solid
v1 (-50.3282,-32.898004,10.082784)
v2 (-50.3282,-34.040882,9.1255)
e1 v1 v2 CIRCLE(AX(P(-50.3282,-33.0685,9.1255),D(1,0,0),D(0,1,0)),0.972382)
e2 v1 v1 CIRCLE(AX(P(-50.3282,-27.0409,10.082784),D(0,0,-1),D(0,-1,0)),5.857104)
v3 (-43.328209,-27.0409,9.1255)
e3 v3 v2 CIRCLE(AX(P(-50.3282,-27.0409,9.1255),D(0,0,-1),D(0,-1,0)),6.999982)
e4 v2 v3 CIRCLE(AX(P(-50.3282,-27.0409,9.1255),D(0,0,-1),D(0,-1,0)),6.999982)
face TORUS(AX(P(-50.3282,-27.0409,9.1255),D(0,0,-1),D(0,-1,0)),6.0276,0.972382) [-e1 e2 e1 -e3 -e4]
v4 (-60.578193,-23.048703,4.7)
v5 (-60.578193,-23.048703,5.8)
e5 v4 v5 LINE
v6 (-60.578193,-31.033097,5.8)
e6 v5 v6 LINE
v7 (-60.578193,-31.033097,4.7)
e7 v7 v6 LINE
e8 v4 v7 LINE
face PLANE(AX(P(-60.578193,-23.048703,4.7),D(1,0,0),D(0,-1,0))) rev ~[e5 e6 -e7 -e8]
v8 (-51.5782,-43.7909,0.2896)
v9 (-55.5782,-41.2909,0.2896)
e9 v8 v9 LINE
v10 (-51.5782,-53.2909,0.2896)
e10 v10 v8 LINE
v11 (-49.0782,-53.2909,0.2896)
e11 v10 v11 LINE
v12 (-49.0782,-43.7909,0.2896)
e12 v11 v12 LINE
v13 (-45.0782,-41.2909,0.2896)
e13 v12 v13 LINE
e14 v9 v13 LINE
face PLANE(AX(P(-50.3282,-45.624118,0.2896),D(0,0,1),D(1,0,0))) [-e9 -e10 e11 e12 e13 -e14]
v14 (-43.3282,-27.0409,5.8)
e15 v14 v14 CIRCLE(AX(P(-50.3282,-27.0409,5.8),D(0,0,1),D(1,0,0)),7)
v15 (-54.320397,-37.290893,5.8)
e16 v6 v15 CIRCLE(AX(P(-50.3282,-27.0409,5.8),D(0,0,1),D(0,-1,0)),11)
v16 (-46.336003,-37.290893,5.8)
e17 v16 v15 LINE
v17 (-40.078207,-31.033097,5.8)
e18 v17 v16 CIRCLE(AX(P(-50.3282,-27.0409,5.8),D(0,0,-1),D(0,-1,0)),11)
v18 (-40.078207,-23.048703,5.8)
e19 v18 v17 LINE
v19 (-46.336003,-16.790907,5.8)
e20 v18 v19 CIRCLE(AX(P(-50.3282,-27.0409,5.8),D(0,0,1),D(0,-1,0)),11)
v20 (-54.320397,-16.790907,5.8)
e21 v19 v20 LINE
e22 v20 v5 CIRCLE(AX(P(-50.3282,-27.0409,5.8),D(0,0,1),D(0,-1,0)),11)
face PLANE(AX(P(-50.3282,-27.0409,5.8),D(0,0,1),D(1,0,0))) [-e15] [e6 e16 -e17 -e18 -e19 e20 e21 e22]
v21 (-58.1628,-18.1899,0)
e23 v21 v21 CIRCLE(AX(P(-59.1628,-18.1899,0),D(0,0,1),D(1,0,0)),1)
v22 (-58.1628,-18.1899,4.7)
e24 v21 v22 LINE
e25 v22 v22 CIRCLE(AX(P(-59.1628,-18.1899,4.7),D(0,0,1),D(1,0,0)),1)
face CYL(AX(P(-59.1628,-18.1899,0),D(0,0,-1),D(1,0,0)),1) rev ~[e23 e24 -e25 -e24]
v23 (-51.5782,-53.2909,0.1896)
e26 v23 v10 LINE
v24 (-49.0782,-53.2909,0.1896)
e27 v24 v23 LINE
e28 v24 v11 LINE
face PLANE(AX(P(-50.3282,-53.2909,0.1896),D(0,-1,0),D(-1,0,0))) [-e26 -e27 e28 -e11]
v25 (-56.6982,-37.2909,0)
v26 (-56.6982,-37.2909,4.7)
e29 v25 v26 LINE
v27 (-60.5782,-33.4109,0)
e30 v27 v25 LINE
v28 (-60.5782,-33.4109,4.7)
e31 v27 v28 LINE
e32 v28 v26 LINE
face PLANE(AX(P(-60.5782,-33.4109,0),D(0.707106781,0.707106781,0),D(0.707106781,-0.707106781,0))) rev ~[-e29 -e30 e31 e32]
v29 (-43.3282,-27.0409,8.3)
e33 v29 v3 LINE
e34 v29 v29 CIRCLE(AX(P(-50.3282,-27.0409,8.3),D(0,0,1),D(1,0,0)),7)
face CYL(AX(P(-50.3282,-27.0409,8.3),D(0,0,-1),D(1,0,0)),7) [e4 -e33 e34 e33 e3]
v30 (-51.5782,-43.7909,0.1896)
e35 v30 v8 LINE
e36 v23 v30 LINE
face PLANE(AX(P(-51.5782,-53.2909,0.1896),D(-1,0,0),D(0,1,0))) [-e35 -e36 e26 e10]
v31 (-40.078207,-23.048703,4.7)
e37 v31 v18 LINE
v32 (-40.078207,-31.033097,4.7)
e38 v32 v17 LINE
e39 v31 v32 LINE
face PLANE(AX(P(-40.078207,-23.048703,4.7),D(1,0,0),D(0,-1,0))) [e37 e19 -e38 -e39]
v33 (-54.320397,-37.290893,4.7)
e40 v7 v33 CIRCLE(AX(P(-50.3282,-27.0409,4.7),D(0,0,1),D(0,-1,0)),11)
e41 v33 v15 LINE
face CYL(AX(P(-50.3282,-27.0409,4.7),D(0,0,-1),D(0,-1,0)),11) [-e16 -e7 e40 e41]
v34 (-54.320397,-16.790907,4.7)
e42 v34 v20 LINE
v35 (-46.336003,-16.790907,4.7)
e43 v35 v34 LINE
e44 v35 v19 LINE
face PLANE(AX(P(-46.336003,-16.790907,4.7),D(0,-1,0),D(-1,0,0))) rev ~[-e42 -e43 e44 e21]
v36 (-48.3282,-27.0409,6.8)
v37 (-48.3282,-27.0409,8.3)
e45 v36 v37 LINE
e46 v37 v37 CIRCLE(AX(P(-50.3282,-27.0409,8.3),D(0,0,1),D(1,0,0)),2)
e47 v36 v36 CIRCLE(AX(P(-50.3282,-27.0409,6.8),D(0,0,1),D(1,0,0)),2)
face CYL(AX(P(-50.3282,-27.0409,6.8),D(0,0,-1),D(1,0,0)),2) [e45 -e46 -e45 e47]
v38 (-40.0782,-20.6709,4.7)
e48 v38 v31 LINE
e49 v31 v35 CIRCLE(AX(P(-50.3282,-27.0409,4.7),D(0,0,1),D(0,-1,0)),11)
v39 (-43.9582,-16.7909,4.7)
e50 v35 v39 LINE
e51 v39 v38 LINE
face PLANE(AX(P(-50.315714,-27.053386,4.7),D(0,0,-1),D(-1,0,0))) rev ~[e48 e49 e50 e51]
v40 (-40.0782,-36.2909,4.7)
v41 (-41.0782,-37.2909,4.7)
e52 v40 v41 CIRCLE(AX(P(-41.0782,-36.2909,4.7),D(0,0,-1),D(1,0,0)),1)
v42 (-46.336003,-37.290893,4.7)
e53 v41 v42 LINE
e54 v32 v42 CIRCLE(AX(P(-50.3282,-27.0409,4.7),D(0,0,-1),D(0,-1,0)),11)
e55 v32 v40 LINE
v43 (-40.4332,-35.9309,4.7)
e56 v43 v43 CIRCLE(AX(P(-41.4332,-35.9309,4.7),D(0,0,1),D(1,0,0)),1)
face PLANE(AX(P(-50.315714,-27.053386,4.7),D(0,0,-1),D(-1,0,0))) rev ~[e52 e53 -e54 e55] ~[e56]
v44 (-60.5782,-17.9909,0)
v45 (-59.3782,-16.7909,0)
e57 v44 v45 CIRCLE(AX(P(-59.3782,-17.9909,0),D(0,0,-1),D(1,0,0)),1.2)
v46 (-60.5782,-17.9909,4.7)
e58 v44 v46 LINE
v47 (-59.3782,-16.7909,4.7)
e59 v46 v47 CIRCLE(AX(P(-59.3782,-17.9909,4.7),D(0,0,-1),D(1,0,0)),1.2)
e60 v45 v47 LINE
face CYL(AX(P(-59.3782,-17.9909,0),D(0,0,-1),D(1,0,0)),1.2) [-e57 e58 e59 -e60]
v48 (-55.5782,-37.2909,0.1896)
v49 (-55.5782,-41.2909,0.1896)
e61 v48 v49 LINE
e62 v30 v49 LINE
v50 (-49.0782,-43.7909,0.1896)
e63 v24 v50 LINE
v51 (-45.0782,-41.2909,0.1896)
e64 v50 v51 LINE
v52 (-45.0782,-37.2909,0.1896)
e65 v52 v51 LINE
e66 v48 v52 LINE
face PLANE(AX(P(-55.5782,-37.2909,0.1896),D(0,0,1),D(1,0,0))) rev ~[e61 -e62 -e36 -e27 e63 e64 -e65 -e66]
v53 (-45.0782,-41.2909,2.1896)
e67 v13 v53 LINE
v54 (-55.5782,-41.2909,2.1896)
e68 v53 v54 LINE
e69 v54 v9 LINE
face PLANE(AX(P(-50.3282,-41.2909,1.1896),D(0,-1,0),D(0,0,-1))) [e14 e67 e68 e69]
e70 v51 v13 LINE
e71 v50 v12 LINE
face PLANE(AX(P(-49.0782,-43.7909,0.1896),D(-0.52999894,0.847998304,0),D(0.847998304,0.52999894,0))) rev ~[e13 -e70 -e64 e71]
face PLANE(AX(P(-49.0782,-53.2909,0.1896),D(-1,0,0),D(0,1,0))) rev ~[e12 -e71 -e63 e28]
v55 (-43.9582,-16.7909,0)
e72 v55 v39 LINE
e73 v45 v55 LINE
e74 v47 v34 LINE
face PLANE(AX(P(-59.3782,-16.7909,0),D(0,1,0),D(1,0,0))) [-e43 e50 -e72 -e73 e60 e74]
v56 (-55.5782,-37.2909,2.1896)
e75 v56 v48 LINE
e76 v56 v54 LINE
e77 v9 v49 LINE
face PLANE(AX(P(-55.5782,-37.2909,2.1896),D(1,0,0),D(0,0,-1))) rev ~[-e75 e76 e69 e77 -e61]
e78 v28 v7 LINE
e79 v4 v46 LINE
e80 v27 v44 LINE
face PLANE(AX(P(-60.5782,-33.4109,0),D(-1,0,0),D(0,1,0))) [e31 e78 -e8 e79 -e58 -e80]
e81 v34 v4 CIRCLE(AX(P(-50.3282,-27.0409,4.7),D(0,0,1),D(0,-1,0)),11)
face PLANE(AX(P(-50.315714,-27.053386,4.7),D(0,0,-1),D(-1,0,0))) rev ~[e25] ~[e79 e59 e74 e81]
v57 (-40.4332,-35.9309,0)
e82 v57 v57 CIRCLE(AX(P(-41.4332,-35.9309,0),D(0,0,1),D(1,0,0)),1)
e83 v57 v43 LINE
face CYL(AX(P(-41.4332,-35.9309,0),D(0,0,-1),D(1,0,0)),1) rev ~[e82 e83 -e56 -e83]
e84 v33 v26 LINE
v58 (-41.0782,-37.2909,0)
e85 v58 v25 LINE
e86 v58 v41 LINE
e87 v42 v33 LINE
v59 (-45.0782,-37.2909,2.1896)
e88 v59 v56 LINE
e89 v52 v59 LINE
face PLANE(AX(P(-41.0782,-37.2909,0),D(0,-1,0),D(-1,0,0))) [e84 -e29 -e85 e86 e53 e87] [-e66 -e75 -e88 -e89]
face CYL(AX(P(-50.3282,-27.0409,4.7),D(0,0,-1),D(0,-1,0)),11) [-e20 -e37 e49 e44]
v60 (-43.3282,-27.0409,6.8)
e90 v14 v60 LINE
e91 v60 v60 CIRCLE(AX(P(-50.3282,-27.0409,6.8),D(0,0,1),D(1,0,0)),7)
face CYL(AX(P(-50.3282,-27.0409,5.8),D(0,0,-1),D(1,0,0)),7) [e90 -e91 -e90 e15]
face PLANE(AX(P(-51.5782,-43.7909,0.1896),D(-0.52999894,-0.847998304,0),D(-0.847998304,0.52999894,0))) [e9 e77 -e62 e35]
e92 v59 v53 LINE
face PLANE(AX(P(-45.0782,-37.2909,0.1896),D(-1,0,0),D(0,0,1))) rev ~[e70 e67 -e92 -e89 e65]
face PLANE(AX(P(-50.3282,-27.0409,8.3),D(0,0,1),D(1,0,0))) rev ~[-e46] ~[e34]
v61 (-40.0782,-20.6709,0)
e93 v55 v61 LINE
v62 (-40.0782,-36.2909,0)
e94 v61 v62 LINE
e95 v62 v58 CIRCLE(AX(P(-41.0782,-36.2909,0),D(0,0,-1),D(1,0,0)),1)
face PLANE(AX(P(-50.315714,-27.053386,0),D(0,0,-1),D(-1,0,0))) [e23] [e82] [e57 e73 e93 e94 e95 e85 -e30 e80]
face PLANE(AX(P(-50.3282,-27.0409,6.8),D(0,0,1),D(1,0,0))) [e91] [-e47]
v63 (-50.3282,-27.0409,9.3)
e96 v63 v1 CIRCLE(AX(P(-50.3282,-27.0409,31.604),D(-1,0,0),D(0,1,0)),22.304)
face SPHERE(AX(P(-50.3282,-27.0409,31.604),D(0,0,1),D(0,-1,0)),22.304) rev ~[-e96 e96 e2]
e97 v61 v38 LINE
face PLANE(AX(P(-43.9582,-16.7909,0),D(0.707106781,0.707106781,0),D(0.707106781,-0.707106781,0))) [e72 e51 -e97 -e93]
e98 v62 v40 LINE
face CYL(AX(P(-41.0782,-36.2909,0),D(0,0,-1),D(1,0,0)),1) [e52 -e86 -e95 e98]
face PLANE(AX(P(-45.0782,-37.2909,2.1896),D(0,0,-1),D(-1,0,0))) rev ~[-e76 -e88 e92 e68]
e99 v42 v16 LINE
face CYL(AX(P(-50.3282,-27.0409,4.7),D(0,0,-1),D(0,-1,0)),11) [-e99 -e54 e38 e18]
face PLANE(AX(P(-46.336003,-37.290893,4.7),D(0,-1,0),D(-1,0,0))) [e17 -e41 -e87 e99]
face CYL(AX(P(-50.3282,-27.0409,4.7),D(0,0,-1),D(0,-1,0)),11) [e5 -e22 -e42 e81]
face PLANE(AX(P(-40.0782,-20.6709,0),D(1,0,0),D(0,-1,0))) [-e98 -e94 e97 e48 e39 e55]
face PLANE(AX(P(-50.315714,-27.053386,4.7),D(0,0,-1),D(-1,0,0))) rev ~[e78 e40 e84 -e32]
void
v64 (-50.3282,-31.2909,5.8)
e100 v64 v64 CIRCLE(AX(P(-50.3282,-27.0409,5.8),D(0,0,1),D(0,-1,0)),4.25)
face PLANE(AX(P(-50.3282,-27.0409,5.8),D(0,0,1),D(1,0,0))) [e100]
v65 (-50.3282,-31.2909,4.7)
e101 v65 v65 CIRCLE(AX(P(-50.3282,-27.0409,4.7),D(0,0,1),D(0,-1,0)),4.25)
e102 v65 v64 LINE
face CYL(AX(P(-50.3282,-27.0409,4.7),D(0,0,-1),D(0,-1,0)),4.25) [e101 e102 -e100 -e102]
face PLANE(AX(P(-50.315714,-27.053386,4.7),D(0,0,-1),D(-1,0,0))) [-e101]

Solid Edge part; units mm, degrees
sketch "Sketch1" plane through (0, 0, 0) normal (0, 0, 1) x (1, 0, 0)
  circle A0 centre (-59.1628, -18.1899) radius 1
  line L0 (-40.0782, -20.6709) -> (-40.0782, -36.2909)
  arc A1 (-40.0782, -36.2909) -> (-41.0782, -37.2909) centre (-41.0782, -36.2909) cw
  line L1 (-41.0782, -37.2909) -> (-56.6982, -37.2909)
  line L2 (-60.5782, -33.4109) -> (-56.6982, -37.2909)
  line L3 (-60.5782, -33.4109) -> (-60.5782, -17.9909)
  arc A2 (-60.5782, -17.9909) -> (-59.3782, -16.7909) centre (-59.3782, -17.9909) cw
  line L4 (-59.3782, -16.7909) -> (-43.9582, -16.7909)
  line L5 (-43.9582, -16.7909) -> (-40.0782, -20.6709)
  circle A3 centre (-41.4332, -35.9309) radius 1
extrude "Protrusion1" add sketch "Sketch1" along normal blind 4.7
sketch "Sketch2" plane through (-50.3282, -27.0409, 4.7) normal (0, 0, 1) x (0, -1, 0)
  circle A0 centre (0, 0) radius 4.25
  arc A1 (-10.25, -3.9922) -> (-3.9922, -10.25) centre (0, 0) ccw
  line L0 (-3.9922, -10.25) -> (3.9922, -10.25)
  arc A2 (3.9922, -10.25) -> (10.25, -3.9922) centre (0, 0) ccw
  line L1 (10.25, 3.9922) -> (10.25, -3.9922)
  arc A3 (3.9922, 10.25) -> (10.25, 3.9922) centre (0, 0) cw
  line L2 (-3.9922, 10.25) -> (3.9922, 10.25)
  arc A4 (-3.9922, 10.25) -> (-10.25, 3.9922) centre (0, 0) ccw
  line L3 (-10.25, 3.9922) -> (-10.25, -3.9922)
extrude "ExtrudedProtrusion_2" add sketch "Sketch2" along normal blind 1.1
sketch "Sketch3" plane through (-50.3282, -27.0409, 5.8) normal (0, 0, 1) x (1, 0, 0)
  circle A0 centre (0, 0) radius 7
extrude "ExtrudedProtrusion_3" add sketch "Sketch3" along normal blind 1
sketch "Sketch4" plane through (-50.3282, -27.0409, 6.8) normal (0, 0, 1) x (1, 0, 0)
  circle A0 centre (0, 0) radius 2
extrude "ExtrudedProtrusion_4" add sketch "Sketch4" along normal blind 1.5
sketch "Sketch5" plane through (-50.3282, -27.0409, 8.3) normal (0, 0, 1) x (1, 0, 0)
  circle A0 centre (0, 0) radius 7
extrude "ExtrudedProtrusion_5" add sketch "Sketch5" along normal blind 2
sketch "Sketch6" plane through (-50.3282, 0, 0) normal (1, 0, 0) x (0, 1, 0)
  line L0 (-34.0409, 10.3) -> (-27.0409, 10.3)
  line L1 (-27.0409, 10.3) -> (-27.0409, 4.8545)
  arc A0 (-27.0409, 9.3) -> (-32.898, 10.0828) centre (-27.0409, 31.604) cw
  arc A1 (-32.898, 10.0828) -> (-34.0409, 9.1255) centre (-33.0685, 9.1255) ccw
  line L2 (-34.0409, 10.3) -> (-34.0409, 9.1255)
revolve "RevolvedCutout1" cut sketch "Sketch6" angle 360 about axis through (-50.3282, -27.0409, 10.3) along (0, 0, -1)
sketch "Sketch7" plane through (-48.8882, -37.2909, 2.9) normal (0, -1, 0) x (1, 0, 0)
  line L0 (-6.69, -0.7104) -> (-6.69, -2.7104)
  line L1 (-6.69, -2.7104) -> (3.81, -2.7104)
  line L2 (3.81, -2.7104) -> (3.81, -0.7104)
  line L3 (3.81, -0.7104) -> (-6.69, -0.7104)
extrude "ExtrudedProtrusion_6" add sketch "Sketch7" along normal blind 4
sketch "Sketch8" plane through (-50.3282, -39.2909, 0.1896) normal (0, 0, -1) x (0, -1, 0)
  line L0 (14, -1.25) -> (4.5, -1.25)
  line L1 (4.5, -1.25) -> (2, -5.25)
  line L2 (2, 5.25) -> (2, -5.25)
  line L3 (4.5, 1.25) -> (2, 5.25)
  line L4 (14, 1.25) -> (4.5, 1.25)
  line L5 (14, 0) -> (14, 1.25)
  line L6 (14, 0) -> (14, -1.25)
extrude "ExtrudedProtrusion_7" add sketch "Sketch8" against normal blind 0.1
